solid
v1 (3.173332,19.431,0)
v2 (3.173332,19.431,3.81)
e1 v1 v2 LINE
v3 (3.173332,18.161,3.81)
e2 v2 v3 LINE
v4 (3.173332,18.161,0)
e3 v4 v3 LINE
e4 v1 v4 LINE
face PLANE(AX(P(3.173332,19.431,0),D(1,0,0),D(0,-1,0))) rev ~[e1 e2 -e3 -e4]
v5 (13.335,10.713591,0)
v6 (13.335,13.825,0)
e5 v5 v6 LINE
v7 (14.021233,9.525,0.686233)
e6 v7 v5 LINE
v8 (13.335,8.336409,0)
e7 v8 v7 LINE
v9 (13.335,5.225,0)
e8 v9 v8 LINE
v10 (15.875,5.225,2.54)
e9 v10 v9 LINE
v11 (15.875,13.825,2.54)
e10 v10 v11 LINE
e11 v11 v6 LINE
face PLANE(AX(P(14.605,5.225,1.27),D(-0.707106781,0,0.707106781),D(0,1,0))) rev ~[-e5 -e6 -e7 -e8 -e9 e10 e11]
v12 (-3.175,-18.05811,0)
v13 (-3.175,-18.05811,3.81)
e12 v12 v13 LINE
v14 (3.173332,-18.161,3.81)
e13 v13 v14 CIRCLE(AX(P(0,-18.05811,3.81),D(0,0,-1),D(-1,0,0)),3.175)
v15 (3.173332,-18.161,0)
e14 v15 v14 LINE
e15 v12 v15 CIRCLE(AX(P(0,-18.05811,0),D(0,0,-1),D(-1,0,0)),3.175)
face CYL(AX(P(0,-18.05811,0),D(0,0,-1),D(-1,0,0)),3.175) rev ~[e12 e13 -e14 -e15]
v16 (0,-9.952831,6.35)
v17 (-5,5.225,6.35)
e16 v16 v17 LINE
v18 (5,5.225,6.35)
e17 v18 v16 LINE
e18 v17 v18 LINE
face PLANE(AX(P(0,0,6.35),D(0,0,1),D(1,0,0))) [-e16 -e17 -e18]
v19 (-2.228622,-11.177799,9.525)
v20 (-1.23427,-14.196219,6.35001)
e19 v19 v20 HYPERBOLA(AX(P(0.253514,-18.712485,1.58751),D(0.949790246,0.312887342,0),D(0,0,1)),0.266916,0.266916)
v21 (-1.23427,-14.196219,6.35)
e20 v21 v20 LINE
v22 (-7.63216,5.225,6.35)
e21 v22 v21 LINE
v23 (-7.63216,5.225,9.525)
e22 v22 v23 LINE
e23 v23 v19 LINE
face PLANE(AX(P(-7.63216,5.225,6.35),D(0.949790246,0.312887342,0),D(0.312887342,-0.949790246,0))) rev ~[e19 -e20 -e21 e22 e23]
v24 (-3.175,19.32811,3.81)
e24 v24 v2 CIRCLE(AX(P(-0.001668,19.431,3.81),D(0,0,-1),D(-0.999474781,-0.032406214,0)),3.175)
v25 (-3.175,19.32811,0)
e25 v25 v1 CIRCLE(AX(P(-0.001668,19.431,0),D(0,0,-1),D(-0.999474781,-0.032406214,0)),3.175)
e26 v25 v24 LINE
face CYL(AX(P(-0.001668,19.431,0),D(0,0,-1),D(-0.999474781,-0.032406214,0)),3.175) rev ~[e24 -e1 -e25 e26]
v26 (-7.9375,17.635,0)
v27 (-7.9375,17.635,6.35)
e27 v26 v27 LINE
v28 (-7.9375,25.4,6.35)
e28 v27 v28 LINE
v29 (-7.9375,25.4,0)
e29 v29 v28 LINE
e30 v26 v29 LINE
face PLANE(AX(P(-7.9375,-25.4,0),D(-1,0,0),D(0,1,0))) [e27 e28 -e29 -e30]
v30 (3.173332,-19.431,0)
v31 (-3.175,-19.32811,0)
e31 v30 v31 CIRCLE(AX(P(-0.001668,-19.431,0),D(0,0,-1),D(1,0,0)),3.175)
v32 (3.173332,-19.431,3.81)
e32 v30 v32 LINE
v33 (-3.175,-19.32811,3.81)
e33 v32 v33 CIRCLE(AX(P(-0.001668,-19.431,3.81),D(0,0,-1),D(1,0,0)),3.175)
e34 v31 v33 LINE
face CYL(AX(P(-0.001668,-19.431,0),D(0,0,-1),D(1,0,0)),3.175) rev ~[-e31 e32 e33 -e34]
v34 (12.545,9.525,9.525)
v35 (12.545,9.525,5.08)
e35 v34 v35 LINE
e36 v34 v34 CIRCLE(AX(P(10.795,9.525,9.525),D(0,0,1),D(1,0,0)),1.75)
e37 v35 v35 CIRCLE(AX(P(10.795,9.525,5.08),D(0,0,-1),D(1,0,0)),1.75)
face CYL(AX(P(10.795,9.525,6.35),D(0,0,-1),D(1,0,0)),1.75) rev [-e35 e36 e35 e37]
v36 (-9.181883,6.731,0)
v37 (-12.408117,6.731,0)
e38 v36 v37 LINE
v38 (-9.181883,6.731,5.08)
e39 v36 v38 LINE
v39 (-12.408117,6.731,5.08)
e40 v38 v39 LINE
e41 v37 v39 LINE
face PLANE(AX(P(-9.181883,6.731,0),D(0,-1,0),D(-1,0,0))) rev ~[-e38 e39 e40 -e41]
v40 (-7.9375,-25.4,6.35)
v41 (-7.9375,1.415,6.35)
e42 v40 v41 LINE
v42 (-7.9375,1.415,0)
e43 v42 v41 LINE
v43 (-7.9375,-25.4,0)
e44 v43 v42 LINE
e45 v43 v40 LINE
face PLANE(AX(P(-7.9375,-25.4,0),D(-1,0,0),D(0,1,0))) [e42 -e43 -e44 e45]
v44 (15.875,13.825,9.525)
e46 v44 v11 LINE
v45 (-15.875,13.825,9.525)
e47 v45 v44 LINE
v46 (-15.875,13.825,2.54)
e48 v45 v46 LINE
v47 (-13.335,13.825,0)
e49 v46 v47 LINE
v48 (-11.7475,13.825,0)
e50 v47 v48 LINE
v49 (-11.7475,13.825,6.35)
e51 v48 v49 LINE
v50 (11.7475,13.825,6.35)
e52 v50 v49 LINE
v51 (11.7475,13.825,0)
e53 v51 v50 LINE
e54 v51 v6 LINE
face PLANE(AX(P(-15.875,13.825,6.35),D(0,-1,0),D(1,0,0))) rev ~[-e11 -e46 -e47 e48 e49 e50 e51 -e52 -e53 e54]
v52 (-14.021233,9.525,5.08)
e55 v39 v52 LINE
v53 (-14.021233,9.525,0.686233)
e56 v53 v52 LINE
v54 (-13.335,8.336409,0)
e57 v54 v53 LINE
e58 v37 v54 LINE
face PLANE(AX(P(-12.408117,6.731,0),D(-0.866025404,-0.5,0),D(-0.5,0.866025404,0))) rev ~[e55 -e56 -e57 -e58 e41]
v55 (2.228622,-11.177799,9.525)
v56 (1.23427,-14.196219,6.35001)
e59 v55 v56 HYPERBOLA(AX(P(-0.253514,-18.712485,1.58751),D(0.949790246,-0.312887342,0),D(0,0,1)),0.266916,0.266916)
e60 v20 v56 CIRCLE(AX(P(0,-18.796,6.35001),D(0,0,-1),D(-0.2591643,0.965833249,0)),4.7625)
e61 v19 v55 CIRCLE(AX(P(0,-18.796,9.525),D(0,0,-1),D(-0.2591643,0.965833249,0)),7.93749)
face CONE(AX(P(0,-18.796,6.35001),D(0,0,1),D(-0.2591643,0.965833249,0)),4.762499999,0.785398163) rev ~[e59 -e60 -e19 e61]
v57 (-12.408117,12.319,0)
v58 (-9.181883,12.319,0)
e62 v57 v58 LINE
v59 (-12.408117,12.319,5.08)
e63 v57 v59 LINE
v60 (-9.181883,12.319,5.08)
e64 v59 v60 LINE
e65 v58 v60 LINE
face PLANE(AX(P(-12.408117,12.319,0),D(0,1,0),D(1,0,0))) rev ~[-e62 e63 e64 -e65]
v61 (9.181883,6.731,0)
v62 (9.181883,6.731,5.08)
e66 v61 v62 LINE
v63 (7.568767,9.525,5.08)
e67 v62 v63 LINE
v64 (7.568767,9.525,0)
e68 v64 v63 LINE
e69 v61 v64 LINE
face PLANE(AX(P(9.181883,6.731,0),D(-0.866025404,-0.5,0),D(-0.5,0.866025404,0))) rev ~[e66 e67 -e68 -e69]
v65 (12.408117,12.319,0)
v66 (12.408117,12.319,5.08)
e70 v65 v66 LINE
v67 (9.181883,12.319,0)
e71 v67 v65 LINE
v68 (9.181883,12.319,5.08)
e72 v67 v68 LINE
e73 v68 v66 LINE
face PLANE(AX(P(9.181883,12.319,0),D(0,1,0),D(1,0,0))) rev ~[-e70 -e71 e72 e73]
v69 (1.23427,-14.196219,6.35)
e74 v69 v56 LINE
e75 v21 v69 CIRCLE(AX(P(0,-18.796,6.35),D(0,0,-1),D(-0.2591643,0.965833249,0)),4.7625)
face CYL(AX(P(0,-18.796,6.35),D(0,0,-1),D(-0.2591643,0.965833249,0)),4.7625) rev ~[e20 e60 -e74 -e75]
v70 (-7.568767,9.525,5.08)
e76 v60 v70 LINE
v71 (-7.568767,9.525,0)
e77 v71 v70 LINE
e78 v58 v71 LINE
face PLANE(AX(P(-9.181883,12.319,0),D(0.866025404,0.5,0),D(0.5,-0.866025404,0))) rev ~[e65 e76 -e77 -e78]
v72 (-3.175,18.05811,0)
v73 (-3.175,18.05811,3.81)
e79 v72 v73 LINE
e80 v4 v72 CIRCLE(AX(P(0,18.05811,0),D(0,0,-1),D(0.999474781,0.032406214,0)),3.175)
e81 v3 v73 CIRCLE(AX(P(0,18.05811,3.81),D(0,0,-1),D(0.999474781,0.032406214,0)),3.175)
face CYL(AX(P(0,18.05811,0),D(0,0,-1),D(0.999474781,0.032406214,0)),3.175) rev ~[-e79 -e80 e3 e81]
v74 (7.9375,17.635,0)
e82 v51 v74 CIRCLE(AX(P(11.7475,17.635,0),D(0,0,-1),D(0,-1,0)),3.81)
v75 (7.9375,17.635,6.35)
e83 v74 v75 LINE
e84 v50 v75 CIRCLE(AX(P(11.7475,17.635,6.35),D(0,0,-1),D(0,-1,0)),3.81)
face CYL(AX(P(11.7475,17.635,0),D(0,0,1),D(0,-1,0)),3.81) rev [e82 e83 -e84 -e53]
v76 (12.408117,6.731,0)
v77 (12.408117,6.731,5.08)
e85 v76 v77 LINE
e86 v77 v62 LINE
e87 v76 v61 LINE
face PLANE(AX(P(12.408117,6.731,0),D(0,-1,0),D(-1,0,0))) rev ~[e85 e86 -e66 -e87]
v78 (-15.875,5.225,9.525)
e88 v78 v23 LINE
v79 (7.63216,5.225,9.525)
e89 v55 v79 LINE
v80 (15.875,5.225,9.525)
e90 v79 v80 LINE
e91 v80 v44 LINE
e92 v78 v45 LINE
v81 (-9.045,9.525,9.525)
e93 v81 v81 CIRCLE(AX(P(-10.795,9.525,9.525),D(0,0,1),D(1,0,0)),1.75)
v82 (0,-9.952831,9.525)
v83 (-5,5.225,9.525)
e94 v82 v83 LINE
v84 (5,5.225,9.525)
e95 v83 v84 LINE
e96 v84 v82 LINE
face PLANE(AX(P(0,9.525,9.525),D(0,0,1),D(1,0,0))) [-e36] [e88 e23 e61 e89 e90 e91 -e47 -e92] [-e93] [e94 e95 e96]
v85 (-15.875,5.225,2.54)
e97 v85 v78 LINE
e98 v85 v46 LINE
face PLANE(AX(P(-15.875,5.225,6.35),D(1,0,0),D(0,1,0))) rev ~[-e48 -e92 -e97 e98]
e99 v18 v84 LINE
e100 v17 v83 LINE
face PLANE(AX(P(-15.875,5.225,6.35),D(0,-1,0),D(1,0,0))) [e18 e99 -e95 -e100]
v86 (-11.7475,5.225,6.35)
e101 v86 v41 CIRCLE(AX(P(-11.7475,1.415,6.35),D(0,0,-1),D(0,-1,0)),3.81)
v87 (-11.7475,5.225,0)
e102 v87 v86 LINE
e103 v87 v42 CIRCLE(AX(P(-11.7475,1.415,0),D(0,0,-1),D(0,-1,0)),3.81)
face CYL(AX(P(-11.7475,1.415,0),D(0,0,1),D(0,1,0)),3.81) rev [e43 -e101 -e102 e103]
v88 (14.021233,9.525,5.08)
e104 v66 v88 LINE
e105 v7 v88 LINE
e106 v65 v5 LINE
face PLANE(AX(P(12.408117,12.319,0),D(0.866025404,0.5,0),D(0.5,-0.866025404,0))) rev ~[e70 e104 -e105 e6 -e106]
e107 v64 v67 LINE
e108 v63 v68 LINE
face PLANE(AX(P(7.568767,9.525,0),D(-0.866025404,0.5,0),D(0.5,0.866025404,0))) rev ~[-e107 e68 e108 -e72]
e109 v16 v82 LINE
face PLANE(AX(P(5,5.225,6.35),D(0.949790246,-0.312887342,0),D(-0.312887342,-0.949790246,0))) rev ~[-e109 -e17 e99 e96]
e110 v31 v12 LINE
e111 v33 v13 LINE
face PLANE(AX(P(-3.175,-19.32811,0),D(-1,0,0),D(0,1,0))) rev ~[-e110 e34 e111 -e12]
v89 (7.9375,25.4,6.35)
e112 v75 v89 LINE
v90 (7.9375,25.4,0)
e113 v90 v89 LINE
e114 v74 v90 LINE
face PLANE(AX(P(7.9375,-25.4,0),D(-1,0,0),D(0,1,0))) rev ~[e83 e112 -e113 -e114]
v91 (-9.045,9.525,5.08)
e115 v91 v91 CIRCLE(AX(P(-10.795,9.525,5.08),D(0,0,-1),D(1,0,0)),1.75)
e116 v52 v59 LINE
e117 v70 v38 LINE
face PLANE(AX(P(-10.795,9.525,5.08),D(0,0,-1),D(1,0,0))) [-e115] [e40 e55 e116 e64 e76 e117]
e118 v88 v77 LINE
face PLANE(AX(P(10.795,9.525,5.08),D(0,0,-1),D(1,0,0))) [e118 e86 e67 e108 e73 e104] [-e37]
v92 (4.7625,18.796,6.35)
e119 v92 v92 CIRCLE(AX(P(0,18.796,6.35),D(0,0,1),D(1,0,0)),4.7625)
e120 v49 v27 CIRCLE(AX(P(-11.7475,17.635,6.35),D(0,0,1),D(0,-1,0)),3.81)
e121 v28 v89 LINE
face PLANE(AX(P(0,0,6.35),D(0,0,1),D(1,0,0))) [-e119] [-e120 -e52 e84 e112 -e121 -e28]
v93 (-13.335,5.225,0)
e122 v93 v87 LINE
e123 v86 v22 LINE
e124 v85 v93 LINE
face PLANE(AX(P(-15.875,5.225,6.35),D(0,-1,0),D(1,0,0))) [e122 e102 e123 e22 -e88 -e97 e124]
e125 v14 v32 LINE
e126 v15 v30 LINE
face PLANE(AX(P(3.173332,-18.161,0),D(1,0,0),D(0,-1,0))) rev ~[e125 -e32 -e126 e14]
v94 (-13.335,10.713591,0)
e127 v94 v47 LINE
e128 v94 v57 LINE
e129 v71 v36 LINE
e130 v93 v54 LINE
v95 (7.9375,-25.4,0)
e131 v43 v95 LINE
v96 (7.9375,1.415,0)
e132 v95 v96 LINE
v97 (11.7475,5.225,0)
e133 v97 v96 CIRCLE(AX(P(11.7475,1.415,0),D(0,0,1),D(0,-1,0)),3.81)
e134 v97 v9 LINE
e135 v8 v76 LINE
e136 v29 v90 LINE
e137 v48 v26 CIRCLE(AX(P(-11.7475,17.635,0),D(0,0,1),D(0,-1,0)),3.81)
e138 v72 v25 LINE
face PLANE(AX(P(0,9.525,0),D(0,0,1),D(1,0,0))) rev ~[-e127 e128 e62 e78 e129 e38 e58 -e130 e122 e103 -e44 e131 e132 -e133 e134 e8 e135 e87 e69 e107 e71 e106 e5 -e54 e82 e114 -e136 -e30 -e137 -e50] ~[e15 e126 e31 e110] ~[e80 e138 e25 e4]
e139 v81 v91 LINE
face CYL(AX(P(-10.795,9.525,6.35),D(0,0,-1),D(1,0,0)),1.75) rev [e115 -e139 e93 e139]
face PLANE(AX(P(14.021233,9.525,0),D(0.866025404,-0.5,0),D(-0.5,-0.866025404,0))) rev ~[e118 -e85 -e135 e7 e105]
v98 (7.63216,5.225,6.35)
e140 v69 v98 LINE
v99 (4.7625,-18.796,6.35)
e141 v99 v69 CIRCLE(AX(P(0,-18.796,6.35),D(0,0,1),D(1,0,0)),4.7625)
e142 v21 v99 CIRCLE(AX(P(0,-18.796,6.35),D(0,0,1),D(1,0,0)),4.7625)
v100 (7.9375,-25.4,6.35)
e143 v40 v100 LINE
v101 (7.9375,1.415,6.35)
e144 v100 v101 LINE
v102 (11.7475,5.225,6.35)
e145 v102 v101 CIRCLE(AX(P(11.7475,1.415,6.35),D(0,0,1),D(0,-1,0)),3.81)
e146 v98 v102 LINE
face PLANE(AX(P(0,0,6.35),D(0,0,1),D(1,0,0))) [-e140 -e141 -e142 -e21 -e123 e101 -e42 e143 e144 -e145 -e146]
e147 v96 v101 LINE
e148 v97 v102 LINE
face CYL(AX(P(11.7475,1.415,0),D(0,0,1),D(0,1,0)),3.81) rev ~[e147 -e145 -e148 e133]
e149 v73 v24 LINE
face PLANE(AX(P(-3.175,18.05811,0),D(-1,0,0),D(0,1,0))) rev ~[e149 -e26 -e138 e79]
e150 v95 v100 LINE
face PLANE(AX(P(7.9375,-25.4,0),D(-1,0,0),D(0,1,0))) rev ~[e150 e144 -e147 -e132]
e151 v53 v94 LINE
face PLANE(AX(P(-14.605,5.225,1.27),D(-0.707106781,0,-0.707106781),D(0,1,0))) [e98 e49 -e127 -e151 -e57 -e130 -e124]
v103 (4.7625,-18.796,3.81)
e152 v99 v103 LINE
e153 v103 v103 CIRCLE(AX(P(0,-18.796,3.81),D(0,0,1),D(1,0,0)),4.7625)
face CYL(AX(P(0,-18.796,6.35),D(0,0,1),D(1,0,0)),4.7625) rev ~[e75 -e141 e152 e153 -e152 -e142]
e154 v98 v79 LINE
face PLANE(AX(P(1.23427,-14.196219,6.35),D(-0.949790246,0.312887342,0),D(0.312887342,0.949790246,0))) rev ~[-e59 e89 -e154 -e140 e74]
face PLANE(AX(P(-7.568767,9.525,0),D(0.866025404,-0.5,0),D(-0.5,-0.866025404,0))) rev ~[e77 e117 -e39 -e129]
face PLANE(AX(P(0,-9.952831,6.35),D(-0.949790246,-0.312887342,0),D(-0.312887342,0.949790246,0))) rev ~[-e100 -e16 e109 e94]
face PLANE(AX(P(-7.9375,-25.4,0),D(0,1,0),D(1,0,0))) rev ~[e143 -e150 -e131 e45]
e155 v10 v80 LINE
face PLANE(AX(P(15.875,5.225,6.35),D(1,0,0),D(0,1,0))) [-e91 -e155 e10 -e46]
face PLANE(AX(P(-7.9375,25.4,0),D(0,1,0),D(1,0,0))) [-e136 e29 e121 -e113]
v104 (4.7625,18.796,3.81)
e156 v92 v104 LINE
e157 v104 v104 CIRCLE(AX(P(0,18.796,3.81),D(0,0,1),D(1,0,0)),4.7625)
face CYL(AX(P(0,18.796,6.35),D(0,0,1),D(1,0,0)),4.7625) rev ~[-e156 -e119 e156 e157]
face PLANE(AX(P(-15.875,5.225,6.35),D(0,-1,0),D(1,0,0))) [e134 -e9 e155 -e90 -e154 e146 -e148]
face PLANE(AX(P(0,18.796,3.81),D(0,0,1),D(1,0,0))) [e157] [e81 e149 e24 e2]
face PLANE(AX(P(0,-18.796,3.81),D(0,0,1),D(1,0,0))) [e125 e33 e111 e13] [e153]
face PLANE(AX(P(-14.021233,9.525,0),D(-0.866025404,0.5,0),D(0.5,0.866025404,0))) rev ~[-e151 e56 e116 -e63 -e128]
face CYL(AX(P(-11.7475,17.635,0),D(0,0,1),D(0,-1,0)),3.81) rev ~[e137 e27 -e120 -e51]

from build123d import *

# Parameters (mm, degrees)
F0_W          = 15.875
F0_H          = 50.8
F1_DEPTH      = 6.35
F2_W          = 31.75
F2_H          = 8.6
F2_R          = 1.75
F3_DEPTH      = 3.175
F3_DEPTH_BACK = 6.35
F4_R          = 4.7625
F5_DEPTH      = 2.54
F6_SIZE       = 2.54
F8_DEPTH      = 5.08
F9_R          = 3.81
F11_DEPTH     = 3.175
F12_SIZE      = 3.17499


# Not quite as in the source:
# - a fillet or chamfer is up to 0.001 mm smaller than in the source, because OpenCascade refuses the exact size


with BuildPart() as f1:
    # F0 (on Top) → F1 (new body)
    with BuildSketch(Plane.XY):
        Rectangle(F0_W, F0_H)
        with BuildLine():
            ThreePointArc((-3.175, -18.058110271), (0.0514516208, -14.8835271912), (3.1733324288, -18.161))
            Line((3.1733324288, -18.161), (3.1733324288, -19.431))
            ThreePointArc((3.1733324288, -19.431), (-0.053119192, -22.6055830798), (-3.175, -19.328110271))
            Line((-3.175, -19.328110271), (-3.175, -18.058110271))
        make_face(mode=Mode.SUBTRACT)
        with BuildLine():
            ThreePointArc((3.1733324288, 18.161), (0.0514516208, 14.8835271912), (-3.175, 18.058110271))
            Line((-3.175, 18.058110271), (-3.175, 19.328110271))
            ThreePointArc((-3.175, 19.328110271), (-0.053119192, 22.6055830798), (3.1733324288, 19.431))
            Line((3.1733324288, 19.431), (3.1733324288, 18.161))
        make_face(mode=Mode.SUBTRACT)
    extrude(amount=F1_DEPTH)

    # F2 (on face) → F3 (join, two sides)
    with BuildSketch(Plane.XY.offset(6.35)) as f3_sk:
        with Locations((0, 9.525)):
            Rectangle(F2_W, F2_H)
        with Locations((-10.795, 9.525)):
            Circle(F2_R, mode=Mode.SUBTRACT)
        with Locations((10.795, 9.525)):
            Circle(F2_R, mode=Mode.SUBTRACT)
    extrude(amount=F3_DEPTH)
    extrude(f3_sk.sketch, amount=-F3_DEPTH_BACK)

    # F4 (on face) → F5 (cut)
    with BuildSketch(Plane.XY.offset(6.35)):
        with Locations((0, -18.796)):
            Circle(F4_R)
        with Locations((0, 18.796)):
            Circle(F4_R)
    extrude(amount=-F5_DEPTH, mode=Mode.SUBTRACT)

    # F6
    f6_edges = [f1.edges().sort_by_distance(p)[0] for p in [
        (-15.875, 9.525, 0),
        (15.875, 9.525, 0),
    ]]
    chamfer(f6_edges, length=F6_SIZE)

    # F7 (on face) → F8 (cut)
    with BuildSketch(Plane(origin=(0, 0, 0), x_dir=(1, 0, 0), z_dir=(0, 0, -1))):
        Polygon((-9.1818833479, -12.319), (-7.5687666958, -9.525), (-9.1818833479, -6.731), (-12.4081166521, -6.731), (-14.0212333042, -9.525), (-12.4081166521, -12.319), align=None)
        Polygon((12.4081166521, -6.731), (9.1818833479, -6.731), (7.5687666958, -9.525), (9.1818833479, -12.319), (12.4081166521, -12.319), (14.0212333042, -9.525), align=None)
    extrude(amount=-F8_DEPTH, mode=Mode.SUBTRACT)

    # F9
    f9_edges = [f1.edges().sort_by_distance(p)[0] for p in [
        (-7.9375, 5.225, 3.175),
        (7.9375, 5.225, 3.175),
        (7.9375, 13.825, 3.175),
        (-7.9375, 13.825, 3.175),
    ]]
    fillet(f9_edges, radius=F9_R)

    # F10 (on face) → F11 (join, through all)
    with BuildSketch(Plane.XY.offset(6.35)):
        with BuildLine():
            Line((-5, 5.225), (-7.6321601122, 5.225))
            Line((-7.6321601122, 5.225), (-1.2342699774, -14.1962191495))
            ThreePointArc((-1.2342699774, -14.1962191495), (0, -14.0335), (1.2342699774, -14.1962191495))
            Line((1.2342699774, -14.1962191495), (7.6321601122, 5.225))
            Line((7.6321601122, 5.225), (5, 5.225))
            Line((5, 5.225), (0, -9.952831082))
            Line((0, -9.952831082), (-5, 5.225))
        make_face()
    extrude(amount=F11_DEPTH)

    # F12 (size 3.175 in the source; OpenCascade refuses exactly that, so slightly less here)
    f12_edges = [f1.edges().sort_by_distance(p)[0] for p in [
        (0, -14.0335, 9.525),
    ]]
    chamfer(f12_edges, length=F12_SIZE)


solid = f1.part
